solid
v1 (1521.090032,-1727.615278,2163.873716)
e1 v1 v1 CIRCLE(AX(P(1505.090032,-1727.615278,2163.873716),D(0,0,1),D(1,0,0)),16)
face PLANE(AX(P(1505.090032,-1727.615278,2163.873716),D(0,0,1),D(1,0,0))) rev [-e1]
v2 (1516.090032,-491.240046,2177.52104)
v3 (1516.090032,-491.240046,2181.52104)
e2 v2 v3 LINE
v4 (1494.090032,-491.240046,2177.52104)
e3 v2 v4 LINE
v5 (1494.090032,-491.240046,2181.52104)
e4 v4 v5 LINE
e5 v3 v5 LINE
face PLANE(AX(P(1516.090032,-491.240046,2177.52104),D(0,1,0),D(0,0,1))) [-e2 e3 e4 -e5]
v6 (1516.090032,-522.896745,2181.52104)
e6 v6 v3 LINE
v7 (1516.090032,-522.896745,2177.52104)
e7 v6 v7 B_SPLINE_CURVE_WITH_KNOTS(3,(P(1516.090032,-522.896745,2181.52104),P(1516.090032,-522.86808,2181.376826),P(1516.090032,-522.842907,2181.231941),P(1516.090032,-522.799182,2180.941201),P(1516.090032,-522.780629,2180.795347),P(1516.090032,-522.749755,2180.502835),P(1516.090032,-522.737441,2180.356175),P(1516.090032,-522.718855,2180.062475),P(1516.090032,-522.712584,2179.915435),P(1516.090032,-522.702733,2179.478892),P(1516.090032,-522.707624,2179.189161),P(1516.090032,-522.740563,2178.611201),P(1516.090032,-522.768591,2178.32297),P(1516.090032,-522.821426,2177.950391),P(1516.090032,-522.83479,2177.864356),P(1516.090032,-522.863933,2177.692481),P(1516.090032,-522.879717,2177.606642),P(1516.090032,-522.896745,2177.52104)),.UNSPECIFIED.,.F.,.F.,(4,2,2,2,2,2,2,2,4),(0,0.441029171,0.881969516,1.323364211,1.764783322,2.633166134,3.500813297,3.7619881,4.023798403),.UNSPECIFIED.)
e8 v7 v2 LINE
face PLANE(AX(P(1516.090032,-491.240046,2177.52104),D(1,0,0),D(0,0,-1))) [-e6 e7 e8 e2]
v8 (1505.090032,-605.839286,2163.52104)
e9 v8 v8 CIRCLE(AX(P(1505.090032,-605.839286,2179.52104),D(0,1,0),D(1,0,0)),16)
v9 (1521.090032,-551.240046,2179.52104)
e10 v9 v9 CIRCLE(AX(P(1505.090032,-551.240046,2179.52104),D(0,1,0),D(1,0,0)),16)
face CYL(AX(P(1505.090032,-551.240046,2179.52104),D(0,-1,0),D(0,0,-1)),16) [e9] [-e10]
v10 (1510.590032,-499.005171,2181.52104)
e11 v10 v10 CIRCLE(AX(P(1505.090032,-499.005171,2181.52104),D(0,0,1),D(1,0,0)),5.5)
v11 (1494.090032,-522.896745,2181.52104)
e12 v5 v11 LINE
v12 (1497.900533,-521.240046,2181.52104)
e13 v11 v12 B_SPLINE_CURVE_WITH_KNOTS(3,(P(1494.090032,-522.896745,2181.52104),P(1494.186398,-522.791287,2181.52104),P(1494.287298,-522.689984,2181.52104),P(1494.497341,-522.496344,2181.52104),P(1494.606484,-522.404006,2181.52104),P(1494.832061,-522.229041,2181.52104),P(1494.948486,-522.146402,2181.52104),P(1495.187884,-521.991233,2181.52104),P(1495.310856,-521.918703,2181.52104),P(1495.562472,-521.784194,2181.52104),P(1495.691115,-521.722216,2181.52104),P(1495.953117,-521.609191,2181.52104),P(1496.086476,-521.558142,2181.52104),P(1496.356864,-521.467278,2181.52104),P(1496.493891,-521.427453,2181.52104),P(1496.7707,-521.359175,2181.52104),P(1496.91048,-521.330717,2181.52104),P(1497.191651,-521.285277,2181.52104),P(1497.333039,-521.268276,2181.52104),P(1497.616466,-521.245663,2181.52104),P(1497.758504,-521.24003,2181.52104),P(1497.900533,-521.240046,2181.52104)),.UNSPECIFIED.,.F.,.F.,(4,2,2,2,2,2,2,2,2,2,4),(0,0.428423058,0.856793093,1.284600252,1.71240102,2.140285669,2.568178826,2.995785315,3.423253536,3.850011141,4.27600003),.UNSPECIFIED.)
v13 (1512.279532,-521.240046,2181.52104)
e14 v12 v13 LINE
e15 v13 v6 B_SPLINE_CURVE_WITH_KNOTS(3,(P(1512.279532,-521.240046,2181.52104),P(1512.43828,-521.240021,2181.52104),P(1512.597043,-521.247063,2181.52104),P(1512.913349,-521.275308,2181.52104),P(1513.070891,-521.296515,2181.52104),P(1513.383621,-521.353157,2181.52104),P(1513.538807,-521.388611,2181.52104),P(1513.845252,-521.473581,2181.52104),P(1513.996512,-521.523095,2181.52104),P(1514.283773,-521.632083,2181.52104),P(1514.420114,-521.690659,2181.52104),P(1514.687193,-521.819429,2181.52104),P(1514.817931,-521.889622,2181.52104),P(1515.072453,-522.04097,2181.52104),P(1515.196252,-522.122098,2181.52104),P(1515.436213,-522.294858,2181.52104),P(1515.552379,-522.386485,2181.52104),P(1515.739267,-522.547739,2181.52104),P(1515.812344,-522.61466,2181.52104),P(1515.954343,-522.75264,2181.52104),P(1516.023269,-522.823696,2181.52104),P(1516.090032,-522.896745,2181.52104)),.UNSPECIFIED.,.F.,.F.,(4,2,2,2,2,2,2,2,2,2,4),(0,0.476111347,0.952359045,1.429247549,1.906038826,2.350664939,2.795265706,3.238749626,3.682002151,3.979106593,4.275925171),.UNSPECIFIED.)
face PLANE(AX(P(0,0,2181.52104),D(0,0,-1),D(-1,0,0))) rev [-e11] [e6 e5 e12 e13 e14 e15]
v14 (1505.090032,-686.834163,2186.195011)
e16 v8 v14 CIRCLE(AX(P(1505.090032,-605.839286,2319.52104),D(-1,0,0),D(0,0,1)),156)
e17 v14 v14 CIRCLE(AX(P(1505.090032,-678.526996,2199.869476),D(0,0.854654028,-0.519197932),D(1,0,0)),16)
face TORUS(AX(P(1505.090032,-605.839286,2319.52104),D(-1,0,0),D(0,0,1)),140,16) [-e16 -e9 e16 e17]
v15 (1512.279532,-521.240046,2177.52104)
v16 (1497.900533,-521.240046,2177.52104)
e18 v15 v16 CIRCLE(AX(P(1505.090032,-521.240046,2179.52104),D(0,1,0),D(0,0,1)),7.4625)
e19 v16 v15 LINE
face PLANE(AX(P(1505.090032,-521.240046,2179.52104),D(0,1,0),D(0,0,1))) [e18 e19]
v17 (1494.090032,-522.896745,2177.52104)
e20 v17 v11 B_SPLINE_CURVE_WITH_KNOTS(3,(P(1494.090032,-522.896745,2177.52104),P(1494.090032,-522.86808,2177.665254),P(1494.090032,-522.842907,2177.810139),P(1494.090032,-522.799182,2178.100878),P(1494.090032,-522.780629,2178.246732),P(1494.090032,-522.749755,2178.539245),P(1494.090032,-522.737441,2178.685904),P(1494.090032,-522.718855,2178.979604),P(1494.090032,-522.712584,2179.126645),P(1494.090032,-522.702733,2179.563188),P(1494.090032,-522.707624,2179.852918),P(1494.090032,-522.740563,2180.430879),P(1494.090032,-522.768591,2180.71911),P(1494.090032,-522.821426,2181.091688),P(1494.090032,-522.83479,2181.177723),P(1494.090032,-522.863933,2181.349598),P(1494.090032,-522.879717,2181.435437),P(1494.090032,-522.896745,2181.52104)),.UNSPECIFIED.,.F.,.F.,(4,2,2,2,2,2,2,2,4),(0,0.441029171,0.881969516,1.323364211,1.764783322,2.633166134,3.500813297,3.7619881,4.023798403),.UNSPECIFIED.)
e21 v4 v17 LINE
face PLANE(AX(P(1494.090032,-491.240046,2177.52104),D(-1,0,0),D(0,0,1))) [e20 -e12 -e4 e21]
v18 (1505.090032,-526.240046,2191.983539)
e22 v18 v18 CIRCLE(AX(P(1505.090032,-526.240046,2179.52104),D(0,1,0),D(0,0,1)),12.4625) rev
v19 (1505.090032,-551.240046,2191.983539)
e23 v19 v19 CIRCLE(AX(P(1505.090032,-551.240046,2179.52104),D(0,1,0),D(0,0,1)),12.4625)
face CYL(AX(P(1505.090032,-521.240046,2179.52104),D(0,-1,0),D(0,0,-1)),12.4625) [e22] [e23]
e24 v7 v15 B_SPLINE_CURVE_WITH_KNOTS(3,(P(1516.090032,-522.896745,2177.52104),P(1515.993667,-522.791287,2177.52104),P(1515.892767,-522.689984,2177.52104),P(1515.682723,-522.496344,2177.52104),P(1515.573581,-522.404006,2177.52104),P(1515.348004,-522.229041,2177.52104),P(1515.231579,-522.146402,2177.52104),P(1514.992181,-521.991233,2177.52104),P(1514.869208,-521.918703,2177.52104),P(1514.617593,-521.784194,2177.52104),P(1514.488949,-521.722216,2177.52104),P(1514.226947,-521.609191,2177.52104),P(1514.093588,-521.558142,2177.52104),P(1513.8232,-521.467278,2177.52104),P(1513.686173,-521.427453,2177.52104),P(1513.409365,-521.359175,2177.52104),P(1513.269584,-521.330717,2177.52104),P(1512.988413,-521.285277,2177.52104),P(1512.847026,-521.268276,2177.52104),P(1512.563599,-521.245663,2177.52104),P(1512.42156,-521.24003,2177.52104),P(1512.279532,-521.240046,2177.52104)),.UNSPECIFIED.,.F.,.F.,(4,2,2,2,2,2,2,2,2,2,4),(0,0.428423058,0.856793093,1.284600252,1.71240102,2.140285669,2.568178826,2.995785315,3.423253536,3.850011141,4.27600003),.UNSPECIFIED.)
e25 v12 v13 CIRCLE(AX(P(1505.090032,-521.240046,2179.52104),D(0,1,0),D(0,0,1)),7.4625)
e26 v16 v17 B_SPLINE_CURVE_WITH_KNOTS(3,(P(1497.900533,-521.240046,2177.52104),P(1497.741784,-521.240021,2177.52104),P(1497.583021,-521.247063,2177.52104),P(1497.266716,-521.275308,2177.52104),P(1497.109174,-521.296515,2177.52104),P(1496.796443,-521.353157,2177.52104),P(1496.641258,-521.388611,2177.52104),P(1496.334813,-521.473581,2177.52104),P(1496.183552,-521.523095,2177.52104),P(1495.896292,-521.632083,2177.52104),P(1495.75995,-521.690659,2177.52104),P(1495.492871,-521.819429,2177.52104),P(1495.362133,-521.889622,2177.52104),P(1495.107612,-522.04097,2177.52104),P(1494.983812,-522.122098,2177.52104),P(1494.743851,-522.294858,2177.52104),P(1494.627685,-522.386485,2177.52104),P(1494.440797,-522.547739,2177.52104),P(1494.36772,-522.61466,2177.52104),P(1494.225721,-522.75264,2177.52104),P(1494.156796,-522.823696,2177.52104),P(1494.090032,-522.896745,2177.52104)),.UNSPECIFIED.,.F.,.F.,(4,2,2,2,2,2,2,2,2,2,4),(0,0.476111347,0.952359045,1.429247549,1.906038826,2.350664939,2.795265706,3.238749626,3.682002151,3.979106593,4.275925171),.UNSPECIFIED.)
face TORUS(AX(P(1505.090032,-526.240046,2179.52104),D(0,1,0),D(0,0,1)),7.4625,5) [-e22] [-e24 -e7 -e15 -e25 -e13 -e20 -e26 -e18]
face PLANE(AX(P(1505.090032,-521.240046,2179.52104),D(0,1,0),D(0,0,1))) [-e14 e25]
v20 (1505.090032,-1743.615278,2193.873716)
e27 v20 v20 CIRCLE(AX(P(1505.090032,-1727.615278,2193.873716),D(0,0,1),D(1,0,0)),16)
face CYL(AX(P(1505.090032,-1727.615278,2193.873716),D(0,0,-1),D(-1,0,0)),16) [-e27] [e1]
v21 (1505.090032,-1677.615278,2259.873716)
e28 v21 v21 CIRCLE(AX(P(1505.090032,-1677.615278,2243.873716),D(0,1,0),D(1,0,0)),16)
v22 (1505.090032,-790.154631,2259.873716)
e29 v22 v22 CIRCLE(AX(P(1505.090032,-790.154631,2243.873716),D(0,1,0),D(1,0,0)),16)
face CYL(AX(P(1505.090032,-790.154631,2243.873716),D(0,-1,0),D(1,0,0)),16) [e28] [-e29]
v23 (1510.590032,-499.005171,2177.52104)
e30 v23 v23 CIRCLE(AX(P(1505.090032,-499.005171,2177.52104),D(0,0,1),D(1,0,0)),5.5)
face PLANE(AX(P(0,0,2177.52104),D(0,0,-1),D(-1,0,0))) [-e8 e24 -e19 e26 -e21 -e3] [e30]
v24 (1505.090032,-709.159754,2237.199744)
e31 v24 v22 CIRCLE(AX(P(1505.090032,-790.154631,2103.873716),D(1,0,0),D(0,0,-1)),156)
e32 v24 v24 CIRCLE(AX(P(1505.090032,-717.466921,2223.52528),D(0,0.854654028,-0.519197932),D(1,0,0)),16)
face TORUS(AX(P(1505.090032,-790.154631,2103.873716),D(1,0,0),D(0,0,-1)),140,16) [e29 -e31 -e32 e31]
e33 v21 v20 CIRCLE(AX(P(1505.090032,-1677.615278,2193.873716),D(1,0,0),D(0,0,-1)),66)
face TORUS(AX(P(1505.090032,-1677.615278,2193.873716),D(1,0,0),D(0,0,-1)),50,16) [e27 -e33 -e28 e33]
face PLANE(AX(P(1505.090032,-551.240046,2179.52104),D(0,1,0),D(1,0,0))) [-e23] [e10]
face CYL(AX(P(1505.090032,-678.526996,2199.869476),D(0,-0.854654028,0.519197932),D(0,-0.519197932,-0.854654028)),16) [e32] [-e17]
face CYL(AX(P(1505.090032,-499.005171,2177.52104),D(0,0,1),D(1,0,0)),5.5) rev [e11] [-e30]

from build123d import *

# Parameters (mm, degrees)
BARRER1_PROFILE_R            = 16
CROQUIS13_R                  = 12.462499683
SALIENTE_EXTRUIR1_DEPTH      = 30
SALIENTE_EXTRUIR2_DEPTH      = 2
SALIENTE_EXTRUIR2_DEPTH_BACK = 2
CROQUIS15_W                  = 22
CROQUIS15_H                  = 30
CROQUIS15_R                  = 5.5
REDONDEO1_R                  = 5


with BuildPart() as part:
    # Barrer1: sweep along a curve in space
    with BuildLine() as barrer1_path:
        Line((1505.090032208, -551.240046142, 2179.521039666), (1505.090032208, -605.839285822, 2179.521039666))
        ThreePointArc((1505.090032208, -605.839285822, 2179.521039666), (1505.090032208, -643.580384492, 2184.704091655), (1505.090032208, -678.526996356, 2199.869475793))
        Line((1505.090032208, -678.526996356, 2199.869475793), (1505.090032208, -717.466920568, 2223.52527976))
        ThreePointArc((1505.090032208, -717.466920568, 2223.52527976), (1505.090032208, -752.413532431, 2238.690663898), (1505.090032208, -790.154631102, 2243.873715887))
        Line((1505.090032208, -790.154631102, 2243.873715887), (1505.090032208, -1677.615278398, 2243.873715887))
        ThreePointArc((1505.090032208, -1677.615278398, 2243.873715887), (1505.090032208, -1712.970617457, 2229.229054946), (1505.090032208, -1727.615278398, 2193.873715887))
        Line((1505.090032208, -1727.615278398, 2193.873715887), (1505.090032208, -1727.615278398, 2163.873715887))
    # Barrer1 profile (on start of the path) → Barrer1 (sweep)
    with BuildSketch(Plane(origin=(1505.090032208, -551.240046142, 2179.521039666), x_dir=(0, 0, -1), z_dir=(0, -1, 0))):
        Circle(BARRER1_PROFILE_R)
    sweep(path=barrer1_path.line)

    # Croquis13 → Saliente-Extruir1 (add)
    with BuildSketch(Plane(origin=(0, -551.240046142, 0), x_dir=(1, 0, 0), z_dir=(0, 1, 0))):
        with Locations(Location((1505.090032208, -2179.521039666, 0), (0, 0, 270))):
            Circle(CROQUIS13_R)
    extrude(amount=SALIENTE_EXTRUIR1_DEPTH)

    # Croquis15 → Saliente-Extruir2 (add, two sides: drawn at the far end of the back side and taken through both)
    with BuildSketch(Plane.XY.offset(2179.521039666).offset(-SALIENTE_EXTRUIR2_DEPTH_BACK)):
        with Locations((1505.090032208, -506.240046142)):
            Rectangle(CROQUIS15_W, CROQUIS15_H)
        with Locations((1505.090032208, -499.005171033)):
            Circle(CROQUIS15_R, mode=Mode.SUBTRACT)
    extrude(amount=SALIENTE_EXTRUIR2_DEPTH + SALIENTE_EXTRUIR2_DEPTH_BACK)

    # Redondeo1
    # the kernel refuses this fillet: 5 mm, written as the material it takes off along each edge
    with BuildSketch(Plane(origin=(1505.090032208, -521.240046142, 2179.521039666), x_dir=(0, 0, 1), z_dir=(-1, 0, 0))) as redondeo1_piece_1_section:
        with BuildLine():
            CenterArc((12.462499683 - REDONDEO1_R, -REDONDEO1_R), REDONDEO1_R, 0, 90)
            Line((12.462499683 - REDONDEO1_R, 0), (12.462499683, 0))
            Line((12.462499683, 0), (12.462499683, -REDONDEO1_R))
        make_face()
    redondeo1_piece_1 = revolve(axis=Axis((1505.090032208, -521.240046142, 2179.521039666), (0, 1, 0)), mode=Mode.PRIVATE)
    redondeo1_piece_1 = split(redondeo1_piece_1, bisect_by=Plane(origin=(1512.161144528, -522.66682116, 2181.521039666), z_dir=(0, 0, 1)), keep=Keep.TOP, mode=Mode.PRIVATE)
    add(redondeo1_piece_1, mode=Mode.SUBTRACT)
    with BuildSketch(Plane(origin=(1505.090032208, -521.240046142, 2179.521039666), x_dir=(0, 0, 1), z_dir=(-1, 0, 0))) as redondeo1_piece_2_section:
        with BuildLine():
            CenterArc((12.462499683 - REDONDEO1_R, -REDONDEO1_R), REDONDEO1_R, 0, 90)
            Line((12.462499683 - REDONDEO1_R, 0), (12.462499683, 0))
            Line((12.462499683, 0), (12.462499683, -REDONDEO1_R))
        make_face()
    redondeo1_piece_2 = revolve(axis=Axis((1505.090032208, -521.240046142, 2179.521039666), (0, 1, 0)), mode=Mode.PRIVATE)
    redondeo1_piece_2 = split(redondeo1_piece_2, bisect_by=Plane(origin=(1505.090032208, -522.66682116, 2177.521039666), z_dir=(0, 0, -1)), keep=Keep.TOP, mode=Mode.PRIVATE)
    add(redondeo1_piece_2, mode=Mode.SUBTRACT)
    with BuildSketch(Plane(origin=(1505.090032208, -521.240046142, 2179.521039666), x_dir=(0, 0, 1), z_dir=(-1, 0, 0))) as redondeo1_piece_3_section:
        with BuildLine():
            CenterArc((12.462499683 - REDONDEO1_R, -REDONDEO1_R), REDONDEO1_R, 0, 90)
            Line((12.462499683 - REDONDEO1_R, 0), (12.462499683, 0))
            Line((12.462499683, 0), (12.462499683, -REDONDEO1_R))
        make_face()
    redondeo1_piece_3 = revolve(axis=Axis((1505.090032208, -521.240046142, 2179.521039666), (0, 1, 0)), mode=Mode.PRIVATE)
    redondeo1_piece_3 = split(redondeo1_piece_3, bisect_by=Plane(origin=(1516.090032208, -522.670135024, 2179.521039666), z_dir=(1, 0, 0)), keep=Keep.TOP, mode=Mode.PRIVATE)
    add(redondeo1_piece_3, mode=Mode.SUBTRACT)
    with BuildSketch(Plane(origin=(1505.090032208, -521.240046142, 2179.521039666), x_dir=(0, 0, 1), z_dir=(-1, 0, 0))) as redondeo1_piece_4_section:
        with BuildLine():
            CenterArc((12.462499683 - REDONDEO1_R, -REDONDEO1_R), REDONDEO1_R, 0, 90)
            Line((12.462499683 - REDONDEO1_R, 0), (12.462499683, 0))
            Line((12.462499683, 0), (12.462499683, -REDONDEO1_R))
        make_face()
    redondeo1_piece_4 = revolve(axis=Axis((1505.090032208, -521.240046142, 2179.521039666), (0, 1, 0)), mode=Mode.PRIVATE)
    redondeo1_piece_4 = split(redondeo1_piece_4, bisect_by=Plane(origin=(1494.090032208, -522.670134816, 2179.521039666), z_dir=(-1, 0, 0)), keep=Keep.TOP, mode=Mode.PRIVATE)
    add(redondeo1_piece_4, mode=Mode.SUBTRACT)


solid = part.part
